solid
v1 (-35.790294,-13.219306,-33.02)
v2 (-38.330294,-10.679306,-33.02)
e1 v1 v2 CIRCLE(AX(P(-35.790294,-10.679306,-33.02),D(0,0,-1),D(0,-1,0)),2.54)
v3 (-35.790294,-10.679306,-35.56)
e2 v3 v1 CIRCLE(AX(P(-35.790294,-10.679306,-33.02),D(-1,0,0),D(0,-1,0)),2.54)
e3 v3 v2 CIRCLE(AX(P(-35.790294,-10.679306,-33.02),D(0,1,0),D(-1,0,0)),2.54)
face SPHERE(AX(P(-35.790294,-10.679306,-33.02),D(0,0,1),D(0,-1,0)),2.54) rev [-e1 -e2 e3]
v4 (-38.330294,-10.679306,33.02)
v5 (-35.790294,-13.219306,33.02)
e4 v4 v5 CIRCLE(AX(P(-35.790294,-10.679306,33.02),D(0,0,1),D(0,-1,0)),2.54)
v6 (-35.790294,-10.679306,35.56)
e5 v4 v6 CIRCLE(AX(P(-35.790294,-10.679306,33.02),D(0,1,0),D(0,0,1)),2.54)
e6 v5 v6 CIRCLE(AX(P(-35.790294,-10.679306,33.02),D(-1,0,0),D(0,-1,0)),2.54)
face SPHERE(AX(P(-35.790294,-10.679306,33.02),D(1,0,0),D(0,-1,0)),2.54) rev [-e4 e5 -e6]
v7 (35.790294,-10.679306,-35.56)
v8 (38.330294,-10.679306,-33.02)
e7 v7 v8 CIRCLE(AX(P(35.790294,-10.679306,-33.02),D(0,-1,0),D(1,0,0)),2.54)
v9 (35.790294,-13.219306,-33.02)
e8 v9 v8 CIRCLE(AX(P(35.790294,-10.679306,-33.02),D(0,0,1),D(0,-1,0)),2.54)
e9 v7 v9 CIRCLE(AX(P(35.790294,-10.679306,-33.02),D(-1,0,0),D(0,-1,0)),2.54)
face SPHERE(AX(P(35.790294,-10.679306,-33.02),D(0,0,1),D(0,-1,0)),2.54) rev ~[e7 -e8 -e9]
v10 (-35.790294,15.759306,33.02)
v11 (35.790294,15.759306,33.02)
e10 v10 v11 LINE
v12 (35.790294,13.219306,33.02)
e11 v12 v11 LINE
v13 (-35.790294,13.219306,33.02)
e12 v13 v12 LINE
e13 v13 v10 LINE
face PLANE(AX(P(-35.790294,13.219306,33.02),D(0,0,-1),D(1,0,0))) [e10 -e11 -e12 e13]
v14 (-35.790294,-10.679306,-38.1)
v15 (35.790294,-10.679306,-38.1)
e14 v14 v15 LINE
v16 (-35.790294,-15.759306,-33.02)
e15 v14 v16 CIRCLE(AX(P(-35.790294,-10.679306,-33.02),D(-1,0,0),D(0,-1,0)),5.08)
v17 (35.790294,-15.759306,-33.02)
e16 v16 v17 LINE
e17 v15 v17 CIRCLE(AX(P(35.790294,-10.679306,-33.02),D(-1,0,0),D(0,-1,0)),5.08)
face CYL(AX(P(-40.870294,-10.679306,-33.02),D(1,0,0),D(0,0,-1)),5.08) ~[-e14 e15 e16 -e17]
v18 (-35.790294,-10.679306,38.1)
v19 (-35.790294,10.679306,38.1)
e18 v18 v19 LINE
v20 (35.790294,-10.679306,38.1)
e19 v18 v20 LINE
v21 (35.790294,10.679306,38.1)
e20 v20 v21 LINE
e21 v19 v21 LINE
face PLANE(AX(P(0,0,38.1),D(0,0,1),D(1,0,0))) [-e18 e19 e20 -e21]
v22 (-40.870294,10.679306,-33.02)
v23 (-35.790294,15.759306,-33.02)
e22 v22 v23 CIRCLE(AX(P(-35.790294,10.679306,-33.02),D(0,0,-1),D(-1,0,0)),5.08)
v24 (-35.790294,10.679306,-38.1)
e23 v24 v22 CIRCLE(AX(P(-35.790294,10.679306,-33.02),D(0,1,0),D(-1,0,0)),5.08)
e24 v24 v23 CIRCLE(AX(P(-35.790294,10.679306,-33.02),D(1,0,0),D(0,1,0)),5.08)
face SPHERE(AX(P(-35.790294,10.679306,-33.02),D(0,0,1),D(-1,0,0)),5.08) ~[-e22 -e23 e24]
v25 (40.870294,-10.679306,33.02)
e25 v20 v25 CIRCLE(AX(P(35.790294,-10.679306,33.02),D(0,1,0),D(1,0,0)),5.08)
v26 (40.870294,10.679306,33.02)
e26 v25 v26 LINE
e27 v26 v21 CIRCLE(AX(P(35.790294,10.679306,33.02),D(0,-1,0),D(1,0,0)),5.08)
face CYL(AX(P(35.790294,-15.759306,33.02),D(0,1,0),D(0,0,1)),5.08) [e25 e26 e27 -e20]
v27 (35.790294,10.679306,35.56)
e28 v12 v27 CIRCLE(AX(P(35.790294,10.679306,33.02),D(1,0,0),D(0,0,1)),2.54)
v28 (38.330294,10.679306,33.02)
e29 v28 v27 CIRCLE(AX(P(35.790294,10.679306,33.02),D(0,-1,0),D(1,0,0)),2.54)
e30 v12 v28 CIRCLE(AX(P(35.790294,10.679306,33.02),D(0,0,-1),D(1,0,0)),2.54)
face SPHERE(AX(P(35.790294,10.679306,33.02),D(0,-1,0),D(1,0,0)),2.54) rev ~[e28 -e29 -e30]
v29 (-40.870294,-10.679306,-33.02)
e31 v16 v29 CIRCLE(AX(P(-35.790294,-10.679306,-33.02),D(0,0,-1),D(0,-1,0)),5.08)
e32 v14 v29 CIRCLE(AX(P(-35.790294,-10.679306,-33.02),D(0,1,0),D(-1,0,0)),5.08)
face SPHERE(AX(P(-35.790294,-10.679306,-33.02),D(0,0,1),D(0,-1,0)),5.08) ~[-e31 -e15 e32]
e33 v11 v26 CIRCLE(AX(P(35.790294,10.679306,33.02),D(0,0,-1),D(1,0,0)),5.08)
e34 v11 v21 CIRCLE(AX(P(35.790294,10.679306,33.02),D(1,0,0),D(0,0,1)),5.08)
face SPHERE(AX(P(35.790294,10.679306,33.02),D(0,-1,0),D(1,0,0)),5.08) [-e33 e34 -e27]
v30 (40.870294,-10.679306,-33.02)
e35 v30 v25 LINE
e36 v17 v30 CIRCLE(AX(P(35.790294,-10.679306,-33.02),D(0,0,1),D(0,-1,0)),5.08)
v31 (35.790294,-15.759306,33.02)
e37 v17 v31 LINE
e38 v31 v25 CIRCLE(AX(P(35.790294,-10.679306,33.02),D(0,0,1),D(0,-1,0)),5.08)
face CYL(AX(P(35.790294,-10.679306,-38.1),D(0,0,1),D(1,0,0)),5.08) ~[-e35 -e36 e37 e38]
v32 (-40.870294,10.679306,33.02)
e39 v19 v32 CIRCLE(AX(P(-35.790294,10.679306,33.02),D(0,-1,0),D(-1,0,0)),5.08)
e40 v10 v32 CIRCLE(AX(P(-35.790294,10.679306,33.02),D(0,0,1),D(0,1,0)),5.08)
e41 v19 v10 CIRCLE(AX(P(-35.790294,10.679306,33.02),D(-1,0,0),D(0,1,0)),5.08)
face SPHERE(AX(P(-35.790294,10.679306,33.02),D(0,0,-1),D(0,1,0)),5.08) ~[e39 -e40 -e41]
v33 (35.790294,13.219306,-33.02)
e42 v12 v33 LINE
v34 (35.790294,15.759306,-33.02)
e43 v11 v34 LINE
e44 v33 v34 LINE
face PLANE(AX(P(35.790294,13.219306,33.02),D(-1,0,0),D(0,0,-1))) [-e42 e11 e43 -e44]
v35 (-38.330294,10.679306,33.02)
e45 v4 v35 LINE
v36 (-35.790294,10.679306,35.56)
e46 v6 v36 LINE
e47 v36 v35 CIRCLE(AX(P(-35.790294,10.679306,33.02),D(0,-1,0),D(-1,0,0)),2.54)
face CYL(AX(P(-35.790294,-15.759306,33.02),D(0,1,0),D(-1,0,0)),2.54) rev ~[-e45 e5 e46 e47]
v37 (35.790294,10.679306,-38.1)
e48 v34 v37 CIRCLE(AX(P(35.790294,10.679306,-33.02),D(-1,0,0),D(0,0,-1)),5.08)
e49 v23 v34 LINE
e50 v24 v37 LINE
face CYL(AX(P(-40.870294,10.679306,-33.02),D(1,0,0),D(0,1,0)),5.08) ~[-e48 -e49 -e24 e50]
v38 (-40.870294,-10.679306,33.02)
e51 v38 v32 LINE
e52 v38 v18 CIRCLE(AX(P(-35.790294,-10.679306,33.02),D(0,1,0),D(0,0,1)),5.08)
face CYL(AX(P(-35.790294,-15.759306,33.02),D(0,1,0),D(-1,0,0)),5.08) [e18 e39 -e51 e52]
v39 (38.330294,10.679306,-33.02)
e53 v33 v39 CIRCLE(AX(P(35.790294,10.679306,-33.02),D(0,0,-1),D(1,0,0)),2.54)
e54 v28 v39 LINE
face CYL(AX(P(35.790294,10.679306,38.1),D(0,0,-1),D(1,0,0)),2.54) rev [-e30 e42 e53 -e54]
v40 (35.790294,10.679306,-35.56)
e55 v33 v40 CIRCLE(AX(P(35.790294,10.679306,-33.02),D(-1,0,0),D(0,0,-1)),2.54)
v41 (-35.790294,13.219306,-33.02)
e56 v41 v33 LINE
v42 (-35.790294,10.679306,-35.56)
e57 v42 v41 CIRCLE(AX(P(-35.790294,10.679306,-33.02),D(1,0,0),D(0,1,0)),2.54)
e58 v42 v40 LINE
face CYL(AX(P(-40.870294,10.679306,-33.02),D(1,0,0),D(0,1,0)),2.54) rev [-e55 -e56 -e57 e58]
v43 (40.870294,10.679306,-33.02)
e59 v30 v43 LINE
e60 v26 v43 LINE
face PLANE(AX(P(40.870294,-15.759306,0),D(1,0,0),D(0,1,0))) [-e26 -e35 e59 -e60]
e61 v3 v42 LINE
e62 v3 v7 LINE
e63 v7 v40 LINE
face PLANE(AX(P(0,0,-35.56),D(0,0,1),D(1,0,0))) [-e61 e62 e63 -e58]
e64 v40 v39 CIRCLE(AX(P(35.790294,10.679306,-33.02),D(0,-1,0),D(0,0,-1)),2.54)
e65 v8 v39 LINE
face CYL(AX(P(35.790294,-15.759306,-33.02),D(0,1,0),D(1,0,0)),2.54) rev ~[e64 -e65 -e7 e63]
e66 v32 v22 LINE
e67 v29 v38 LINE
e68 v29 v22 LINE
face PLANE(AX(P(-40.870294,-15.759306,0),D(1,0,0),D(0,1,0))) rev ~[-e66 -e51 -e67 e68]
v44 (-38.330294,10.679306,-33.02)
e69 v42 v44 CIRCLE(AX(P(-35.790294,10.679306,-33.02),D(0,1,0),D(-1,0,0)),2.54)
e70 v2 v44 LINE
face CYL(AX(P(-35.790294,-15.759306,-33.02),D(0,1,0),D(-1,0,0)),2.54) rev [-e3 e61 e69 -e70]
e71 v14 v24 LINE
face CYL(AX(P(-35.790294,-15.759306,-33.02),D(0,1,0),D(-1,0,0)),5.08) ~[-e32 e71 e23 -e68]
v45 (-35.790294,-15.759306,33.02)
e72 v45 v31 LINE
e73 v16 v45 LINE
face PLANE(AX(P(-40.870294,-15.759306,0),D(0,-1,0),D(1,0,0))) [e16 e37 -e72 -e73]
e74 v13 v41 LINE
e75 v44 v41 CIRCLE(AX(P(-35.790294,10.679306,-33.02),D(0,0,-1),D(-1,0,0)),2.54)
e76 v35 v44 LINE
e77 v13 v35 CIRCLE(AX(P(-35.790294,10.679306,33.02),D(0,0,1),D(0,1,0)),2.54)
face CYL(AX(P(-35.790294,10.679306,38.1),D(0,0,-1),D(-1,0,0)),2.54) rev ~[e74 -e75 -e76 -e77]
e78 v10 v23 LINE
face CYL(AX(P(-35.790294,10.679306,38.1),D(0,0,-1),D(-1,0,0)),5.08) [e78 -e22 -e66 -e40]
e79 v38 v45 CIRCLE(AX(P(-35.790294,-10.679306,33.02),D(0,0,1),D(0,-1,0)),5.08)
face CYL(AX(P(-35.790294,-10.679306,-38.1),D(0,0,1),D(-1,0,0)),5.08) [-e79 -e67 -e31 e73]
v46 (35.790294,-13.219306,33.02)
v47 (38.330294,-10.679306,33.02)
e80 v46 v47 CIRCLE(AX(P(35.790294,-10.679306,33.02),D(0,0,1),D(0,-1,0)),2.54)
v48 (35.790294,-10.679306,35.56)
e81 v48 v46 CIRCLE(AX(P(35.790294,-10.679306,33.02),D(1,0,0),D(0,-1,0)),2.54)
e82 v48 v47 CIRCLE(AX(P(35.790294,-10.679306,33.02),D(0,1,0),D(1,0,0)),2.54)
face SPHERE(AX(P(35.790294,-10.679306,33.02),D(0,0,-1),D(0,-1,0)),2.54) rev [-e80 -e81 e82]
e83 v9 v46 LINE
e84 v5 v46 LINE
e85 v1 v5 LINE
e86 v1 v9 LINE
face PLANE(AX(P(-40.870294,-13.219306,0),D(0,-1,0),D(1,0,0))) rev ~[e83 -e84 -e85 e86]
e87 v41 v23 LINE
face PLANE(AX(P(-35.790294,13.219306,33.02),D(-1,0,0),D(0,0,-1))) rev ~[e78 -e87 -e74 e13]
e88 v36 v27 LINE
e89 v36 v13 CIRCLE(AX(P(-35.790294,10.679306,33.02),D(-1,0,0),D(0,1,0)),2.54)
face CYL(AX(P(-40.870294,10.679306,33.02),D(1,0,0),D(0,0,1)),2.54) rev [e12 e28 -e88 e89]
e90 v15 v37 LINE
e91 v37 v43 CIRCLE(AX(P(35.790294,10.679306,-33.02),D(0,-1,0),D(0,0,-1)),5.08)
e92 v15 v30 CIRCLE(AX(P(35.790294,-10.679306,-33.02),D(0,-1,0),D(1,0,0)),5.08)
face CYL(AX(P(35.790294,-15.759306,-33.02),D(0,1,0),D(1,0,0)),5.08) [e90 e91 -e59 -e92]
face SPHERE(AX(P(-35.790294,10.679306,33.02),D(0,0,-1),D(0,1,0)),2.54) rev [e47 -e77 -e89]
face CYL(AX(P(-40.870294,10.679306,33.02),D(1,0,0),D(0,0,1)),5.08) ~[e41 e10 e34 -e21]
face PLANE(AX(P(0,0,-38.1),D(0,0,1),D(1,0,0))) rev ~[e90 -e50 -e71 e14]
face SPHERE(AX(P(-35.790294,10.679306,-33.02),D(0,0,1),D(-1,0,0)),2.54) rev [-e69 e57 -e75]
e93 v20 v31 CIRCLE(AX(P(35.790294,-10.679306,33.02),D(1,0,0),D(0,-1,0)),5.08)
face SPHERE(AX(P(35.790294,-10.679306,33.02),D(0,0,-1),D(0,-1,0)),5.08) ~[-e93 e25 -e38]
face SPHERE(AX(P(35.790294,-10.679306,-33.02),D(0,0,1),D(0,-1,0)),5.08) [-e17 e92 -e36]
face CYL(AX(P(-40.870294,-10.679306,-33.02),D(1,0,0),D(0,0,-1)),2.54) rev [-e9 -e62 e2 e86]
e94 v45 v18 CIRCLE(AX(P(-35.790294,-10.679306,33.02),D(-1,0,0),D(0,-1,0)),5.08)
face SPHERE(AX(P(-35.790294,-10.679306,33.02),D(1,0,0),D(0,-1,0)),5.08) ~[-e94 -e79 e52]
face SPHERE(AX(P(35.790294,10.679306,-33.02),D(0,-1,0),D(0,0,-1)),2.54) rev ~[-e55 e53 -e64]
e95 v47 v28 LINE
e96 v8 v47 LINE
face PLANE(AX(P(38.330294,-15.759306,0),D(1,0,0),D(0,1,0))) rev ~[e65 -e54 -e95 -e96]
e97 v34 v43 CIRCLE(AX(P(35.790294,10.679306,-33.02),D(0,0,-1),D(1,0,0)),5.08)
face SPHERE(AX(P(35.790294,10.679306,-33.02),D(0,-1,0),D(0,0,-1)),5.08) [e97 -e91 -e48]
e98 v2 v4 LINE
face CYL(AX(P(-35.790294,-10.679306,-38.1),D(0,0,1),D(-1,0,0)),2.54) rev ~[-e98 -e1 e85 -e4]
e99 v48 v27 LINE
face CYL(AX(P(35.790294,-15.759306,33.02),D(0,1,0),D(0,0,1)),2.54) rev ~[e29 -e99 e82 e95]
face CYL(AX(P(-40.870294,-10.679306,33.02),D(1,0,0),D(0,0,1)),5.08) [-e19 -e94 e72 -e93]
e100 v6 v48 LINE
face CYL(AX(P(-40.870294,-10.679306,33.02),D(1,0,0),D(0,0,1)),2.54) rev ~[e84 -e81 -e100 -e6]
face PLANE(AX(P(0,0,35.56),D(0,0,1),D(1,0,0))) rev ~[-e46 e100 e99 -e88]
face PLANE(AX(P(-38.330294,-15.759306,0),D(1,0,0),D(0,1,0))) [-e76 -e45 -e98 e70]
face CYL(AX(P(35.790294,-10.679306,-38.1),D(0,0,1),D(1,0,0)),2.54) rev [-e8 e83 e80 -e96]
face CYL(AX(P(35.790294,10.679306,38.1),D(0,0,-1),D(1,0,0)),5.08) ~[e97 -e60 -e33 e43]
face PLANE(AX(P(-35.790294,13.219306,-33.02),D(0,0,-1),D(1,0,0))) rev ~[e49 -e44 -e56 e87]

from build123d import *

# Parameters (mm, degrees)
F0_W     = 81.7405879498
F0_H     = 31.518612057
F1_DEPTH = 38.1
F2_R     = 5.08
F3_T     = -2.54


# Not quite as in the source:
# - a shell that OpenCascade refuses in one call is made with other operations: the cavity is built on its own and cut out


with BuildPart() as f1:
    # F0 (on Top) → F1 (new body, symmetric)
    with BuildSketch(Plane.XY):
        Rectangle(F0_W, F0_H)
    extrude(amount=F1_DEPTH, both=True)

    # F2
    f2_edges = [f1.edges().sort_by_distance(p)[0] for p in [
        (40.870294, -15.759306, 0),
        (0, -15.759306, 38.1),
        (-40.870294, -15.759306, 0),
        (0, -15.759306, -38.1),
        (-40.870294, 15.759306, 0),
        (-40.870294, 0, -38.1),
        (40.870294, 0, -38.1),
        (0, 15.759306, -38.1),
        (40.870294, 0, 38.1),
        (40.870294, 15.759306, 0),
        (0, 15.759306, 38.1),
        (-40.870294, 0, 38.1),
    ]]
    fillet(f2_edges, radius=F2_R)

    # F3: a shell. OpenCascade refuses it in one call, so the cavity is built on its own and cut out:
    # the body offset inwards by the wall thickness, plus a prism from it out through each open face.
    f3_core = offset(f1.part, amount=F3_T, mode=Mode.PRIVATE)
    f3_exits = [f3_core.faces().sort_by_distance(p)[0] for p in [
        (0, 13.219306, 0),
    ]]
    add(f3_core, mode=Mode.SUBTRACT)
    extrude(f3_exits, amount=-F3_T, mode=Mode.SUBTRACT)


solid = f1.part
